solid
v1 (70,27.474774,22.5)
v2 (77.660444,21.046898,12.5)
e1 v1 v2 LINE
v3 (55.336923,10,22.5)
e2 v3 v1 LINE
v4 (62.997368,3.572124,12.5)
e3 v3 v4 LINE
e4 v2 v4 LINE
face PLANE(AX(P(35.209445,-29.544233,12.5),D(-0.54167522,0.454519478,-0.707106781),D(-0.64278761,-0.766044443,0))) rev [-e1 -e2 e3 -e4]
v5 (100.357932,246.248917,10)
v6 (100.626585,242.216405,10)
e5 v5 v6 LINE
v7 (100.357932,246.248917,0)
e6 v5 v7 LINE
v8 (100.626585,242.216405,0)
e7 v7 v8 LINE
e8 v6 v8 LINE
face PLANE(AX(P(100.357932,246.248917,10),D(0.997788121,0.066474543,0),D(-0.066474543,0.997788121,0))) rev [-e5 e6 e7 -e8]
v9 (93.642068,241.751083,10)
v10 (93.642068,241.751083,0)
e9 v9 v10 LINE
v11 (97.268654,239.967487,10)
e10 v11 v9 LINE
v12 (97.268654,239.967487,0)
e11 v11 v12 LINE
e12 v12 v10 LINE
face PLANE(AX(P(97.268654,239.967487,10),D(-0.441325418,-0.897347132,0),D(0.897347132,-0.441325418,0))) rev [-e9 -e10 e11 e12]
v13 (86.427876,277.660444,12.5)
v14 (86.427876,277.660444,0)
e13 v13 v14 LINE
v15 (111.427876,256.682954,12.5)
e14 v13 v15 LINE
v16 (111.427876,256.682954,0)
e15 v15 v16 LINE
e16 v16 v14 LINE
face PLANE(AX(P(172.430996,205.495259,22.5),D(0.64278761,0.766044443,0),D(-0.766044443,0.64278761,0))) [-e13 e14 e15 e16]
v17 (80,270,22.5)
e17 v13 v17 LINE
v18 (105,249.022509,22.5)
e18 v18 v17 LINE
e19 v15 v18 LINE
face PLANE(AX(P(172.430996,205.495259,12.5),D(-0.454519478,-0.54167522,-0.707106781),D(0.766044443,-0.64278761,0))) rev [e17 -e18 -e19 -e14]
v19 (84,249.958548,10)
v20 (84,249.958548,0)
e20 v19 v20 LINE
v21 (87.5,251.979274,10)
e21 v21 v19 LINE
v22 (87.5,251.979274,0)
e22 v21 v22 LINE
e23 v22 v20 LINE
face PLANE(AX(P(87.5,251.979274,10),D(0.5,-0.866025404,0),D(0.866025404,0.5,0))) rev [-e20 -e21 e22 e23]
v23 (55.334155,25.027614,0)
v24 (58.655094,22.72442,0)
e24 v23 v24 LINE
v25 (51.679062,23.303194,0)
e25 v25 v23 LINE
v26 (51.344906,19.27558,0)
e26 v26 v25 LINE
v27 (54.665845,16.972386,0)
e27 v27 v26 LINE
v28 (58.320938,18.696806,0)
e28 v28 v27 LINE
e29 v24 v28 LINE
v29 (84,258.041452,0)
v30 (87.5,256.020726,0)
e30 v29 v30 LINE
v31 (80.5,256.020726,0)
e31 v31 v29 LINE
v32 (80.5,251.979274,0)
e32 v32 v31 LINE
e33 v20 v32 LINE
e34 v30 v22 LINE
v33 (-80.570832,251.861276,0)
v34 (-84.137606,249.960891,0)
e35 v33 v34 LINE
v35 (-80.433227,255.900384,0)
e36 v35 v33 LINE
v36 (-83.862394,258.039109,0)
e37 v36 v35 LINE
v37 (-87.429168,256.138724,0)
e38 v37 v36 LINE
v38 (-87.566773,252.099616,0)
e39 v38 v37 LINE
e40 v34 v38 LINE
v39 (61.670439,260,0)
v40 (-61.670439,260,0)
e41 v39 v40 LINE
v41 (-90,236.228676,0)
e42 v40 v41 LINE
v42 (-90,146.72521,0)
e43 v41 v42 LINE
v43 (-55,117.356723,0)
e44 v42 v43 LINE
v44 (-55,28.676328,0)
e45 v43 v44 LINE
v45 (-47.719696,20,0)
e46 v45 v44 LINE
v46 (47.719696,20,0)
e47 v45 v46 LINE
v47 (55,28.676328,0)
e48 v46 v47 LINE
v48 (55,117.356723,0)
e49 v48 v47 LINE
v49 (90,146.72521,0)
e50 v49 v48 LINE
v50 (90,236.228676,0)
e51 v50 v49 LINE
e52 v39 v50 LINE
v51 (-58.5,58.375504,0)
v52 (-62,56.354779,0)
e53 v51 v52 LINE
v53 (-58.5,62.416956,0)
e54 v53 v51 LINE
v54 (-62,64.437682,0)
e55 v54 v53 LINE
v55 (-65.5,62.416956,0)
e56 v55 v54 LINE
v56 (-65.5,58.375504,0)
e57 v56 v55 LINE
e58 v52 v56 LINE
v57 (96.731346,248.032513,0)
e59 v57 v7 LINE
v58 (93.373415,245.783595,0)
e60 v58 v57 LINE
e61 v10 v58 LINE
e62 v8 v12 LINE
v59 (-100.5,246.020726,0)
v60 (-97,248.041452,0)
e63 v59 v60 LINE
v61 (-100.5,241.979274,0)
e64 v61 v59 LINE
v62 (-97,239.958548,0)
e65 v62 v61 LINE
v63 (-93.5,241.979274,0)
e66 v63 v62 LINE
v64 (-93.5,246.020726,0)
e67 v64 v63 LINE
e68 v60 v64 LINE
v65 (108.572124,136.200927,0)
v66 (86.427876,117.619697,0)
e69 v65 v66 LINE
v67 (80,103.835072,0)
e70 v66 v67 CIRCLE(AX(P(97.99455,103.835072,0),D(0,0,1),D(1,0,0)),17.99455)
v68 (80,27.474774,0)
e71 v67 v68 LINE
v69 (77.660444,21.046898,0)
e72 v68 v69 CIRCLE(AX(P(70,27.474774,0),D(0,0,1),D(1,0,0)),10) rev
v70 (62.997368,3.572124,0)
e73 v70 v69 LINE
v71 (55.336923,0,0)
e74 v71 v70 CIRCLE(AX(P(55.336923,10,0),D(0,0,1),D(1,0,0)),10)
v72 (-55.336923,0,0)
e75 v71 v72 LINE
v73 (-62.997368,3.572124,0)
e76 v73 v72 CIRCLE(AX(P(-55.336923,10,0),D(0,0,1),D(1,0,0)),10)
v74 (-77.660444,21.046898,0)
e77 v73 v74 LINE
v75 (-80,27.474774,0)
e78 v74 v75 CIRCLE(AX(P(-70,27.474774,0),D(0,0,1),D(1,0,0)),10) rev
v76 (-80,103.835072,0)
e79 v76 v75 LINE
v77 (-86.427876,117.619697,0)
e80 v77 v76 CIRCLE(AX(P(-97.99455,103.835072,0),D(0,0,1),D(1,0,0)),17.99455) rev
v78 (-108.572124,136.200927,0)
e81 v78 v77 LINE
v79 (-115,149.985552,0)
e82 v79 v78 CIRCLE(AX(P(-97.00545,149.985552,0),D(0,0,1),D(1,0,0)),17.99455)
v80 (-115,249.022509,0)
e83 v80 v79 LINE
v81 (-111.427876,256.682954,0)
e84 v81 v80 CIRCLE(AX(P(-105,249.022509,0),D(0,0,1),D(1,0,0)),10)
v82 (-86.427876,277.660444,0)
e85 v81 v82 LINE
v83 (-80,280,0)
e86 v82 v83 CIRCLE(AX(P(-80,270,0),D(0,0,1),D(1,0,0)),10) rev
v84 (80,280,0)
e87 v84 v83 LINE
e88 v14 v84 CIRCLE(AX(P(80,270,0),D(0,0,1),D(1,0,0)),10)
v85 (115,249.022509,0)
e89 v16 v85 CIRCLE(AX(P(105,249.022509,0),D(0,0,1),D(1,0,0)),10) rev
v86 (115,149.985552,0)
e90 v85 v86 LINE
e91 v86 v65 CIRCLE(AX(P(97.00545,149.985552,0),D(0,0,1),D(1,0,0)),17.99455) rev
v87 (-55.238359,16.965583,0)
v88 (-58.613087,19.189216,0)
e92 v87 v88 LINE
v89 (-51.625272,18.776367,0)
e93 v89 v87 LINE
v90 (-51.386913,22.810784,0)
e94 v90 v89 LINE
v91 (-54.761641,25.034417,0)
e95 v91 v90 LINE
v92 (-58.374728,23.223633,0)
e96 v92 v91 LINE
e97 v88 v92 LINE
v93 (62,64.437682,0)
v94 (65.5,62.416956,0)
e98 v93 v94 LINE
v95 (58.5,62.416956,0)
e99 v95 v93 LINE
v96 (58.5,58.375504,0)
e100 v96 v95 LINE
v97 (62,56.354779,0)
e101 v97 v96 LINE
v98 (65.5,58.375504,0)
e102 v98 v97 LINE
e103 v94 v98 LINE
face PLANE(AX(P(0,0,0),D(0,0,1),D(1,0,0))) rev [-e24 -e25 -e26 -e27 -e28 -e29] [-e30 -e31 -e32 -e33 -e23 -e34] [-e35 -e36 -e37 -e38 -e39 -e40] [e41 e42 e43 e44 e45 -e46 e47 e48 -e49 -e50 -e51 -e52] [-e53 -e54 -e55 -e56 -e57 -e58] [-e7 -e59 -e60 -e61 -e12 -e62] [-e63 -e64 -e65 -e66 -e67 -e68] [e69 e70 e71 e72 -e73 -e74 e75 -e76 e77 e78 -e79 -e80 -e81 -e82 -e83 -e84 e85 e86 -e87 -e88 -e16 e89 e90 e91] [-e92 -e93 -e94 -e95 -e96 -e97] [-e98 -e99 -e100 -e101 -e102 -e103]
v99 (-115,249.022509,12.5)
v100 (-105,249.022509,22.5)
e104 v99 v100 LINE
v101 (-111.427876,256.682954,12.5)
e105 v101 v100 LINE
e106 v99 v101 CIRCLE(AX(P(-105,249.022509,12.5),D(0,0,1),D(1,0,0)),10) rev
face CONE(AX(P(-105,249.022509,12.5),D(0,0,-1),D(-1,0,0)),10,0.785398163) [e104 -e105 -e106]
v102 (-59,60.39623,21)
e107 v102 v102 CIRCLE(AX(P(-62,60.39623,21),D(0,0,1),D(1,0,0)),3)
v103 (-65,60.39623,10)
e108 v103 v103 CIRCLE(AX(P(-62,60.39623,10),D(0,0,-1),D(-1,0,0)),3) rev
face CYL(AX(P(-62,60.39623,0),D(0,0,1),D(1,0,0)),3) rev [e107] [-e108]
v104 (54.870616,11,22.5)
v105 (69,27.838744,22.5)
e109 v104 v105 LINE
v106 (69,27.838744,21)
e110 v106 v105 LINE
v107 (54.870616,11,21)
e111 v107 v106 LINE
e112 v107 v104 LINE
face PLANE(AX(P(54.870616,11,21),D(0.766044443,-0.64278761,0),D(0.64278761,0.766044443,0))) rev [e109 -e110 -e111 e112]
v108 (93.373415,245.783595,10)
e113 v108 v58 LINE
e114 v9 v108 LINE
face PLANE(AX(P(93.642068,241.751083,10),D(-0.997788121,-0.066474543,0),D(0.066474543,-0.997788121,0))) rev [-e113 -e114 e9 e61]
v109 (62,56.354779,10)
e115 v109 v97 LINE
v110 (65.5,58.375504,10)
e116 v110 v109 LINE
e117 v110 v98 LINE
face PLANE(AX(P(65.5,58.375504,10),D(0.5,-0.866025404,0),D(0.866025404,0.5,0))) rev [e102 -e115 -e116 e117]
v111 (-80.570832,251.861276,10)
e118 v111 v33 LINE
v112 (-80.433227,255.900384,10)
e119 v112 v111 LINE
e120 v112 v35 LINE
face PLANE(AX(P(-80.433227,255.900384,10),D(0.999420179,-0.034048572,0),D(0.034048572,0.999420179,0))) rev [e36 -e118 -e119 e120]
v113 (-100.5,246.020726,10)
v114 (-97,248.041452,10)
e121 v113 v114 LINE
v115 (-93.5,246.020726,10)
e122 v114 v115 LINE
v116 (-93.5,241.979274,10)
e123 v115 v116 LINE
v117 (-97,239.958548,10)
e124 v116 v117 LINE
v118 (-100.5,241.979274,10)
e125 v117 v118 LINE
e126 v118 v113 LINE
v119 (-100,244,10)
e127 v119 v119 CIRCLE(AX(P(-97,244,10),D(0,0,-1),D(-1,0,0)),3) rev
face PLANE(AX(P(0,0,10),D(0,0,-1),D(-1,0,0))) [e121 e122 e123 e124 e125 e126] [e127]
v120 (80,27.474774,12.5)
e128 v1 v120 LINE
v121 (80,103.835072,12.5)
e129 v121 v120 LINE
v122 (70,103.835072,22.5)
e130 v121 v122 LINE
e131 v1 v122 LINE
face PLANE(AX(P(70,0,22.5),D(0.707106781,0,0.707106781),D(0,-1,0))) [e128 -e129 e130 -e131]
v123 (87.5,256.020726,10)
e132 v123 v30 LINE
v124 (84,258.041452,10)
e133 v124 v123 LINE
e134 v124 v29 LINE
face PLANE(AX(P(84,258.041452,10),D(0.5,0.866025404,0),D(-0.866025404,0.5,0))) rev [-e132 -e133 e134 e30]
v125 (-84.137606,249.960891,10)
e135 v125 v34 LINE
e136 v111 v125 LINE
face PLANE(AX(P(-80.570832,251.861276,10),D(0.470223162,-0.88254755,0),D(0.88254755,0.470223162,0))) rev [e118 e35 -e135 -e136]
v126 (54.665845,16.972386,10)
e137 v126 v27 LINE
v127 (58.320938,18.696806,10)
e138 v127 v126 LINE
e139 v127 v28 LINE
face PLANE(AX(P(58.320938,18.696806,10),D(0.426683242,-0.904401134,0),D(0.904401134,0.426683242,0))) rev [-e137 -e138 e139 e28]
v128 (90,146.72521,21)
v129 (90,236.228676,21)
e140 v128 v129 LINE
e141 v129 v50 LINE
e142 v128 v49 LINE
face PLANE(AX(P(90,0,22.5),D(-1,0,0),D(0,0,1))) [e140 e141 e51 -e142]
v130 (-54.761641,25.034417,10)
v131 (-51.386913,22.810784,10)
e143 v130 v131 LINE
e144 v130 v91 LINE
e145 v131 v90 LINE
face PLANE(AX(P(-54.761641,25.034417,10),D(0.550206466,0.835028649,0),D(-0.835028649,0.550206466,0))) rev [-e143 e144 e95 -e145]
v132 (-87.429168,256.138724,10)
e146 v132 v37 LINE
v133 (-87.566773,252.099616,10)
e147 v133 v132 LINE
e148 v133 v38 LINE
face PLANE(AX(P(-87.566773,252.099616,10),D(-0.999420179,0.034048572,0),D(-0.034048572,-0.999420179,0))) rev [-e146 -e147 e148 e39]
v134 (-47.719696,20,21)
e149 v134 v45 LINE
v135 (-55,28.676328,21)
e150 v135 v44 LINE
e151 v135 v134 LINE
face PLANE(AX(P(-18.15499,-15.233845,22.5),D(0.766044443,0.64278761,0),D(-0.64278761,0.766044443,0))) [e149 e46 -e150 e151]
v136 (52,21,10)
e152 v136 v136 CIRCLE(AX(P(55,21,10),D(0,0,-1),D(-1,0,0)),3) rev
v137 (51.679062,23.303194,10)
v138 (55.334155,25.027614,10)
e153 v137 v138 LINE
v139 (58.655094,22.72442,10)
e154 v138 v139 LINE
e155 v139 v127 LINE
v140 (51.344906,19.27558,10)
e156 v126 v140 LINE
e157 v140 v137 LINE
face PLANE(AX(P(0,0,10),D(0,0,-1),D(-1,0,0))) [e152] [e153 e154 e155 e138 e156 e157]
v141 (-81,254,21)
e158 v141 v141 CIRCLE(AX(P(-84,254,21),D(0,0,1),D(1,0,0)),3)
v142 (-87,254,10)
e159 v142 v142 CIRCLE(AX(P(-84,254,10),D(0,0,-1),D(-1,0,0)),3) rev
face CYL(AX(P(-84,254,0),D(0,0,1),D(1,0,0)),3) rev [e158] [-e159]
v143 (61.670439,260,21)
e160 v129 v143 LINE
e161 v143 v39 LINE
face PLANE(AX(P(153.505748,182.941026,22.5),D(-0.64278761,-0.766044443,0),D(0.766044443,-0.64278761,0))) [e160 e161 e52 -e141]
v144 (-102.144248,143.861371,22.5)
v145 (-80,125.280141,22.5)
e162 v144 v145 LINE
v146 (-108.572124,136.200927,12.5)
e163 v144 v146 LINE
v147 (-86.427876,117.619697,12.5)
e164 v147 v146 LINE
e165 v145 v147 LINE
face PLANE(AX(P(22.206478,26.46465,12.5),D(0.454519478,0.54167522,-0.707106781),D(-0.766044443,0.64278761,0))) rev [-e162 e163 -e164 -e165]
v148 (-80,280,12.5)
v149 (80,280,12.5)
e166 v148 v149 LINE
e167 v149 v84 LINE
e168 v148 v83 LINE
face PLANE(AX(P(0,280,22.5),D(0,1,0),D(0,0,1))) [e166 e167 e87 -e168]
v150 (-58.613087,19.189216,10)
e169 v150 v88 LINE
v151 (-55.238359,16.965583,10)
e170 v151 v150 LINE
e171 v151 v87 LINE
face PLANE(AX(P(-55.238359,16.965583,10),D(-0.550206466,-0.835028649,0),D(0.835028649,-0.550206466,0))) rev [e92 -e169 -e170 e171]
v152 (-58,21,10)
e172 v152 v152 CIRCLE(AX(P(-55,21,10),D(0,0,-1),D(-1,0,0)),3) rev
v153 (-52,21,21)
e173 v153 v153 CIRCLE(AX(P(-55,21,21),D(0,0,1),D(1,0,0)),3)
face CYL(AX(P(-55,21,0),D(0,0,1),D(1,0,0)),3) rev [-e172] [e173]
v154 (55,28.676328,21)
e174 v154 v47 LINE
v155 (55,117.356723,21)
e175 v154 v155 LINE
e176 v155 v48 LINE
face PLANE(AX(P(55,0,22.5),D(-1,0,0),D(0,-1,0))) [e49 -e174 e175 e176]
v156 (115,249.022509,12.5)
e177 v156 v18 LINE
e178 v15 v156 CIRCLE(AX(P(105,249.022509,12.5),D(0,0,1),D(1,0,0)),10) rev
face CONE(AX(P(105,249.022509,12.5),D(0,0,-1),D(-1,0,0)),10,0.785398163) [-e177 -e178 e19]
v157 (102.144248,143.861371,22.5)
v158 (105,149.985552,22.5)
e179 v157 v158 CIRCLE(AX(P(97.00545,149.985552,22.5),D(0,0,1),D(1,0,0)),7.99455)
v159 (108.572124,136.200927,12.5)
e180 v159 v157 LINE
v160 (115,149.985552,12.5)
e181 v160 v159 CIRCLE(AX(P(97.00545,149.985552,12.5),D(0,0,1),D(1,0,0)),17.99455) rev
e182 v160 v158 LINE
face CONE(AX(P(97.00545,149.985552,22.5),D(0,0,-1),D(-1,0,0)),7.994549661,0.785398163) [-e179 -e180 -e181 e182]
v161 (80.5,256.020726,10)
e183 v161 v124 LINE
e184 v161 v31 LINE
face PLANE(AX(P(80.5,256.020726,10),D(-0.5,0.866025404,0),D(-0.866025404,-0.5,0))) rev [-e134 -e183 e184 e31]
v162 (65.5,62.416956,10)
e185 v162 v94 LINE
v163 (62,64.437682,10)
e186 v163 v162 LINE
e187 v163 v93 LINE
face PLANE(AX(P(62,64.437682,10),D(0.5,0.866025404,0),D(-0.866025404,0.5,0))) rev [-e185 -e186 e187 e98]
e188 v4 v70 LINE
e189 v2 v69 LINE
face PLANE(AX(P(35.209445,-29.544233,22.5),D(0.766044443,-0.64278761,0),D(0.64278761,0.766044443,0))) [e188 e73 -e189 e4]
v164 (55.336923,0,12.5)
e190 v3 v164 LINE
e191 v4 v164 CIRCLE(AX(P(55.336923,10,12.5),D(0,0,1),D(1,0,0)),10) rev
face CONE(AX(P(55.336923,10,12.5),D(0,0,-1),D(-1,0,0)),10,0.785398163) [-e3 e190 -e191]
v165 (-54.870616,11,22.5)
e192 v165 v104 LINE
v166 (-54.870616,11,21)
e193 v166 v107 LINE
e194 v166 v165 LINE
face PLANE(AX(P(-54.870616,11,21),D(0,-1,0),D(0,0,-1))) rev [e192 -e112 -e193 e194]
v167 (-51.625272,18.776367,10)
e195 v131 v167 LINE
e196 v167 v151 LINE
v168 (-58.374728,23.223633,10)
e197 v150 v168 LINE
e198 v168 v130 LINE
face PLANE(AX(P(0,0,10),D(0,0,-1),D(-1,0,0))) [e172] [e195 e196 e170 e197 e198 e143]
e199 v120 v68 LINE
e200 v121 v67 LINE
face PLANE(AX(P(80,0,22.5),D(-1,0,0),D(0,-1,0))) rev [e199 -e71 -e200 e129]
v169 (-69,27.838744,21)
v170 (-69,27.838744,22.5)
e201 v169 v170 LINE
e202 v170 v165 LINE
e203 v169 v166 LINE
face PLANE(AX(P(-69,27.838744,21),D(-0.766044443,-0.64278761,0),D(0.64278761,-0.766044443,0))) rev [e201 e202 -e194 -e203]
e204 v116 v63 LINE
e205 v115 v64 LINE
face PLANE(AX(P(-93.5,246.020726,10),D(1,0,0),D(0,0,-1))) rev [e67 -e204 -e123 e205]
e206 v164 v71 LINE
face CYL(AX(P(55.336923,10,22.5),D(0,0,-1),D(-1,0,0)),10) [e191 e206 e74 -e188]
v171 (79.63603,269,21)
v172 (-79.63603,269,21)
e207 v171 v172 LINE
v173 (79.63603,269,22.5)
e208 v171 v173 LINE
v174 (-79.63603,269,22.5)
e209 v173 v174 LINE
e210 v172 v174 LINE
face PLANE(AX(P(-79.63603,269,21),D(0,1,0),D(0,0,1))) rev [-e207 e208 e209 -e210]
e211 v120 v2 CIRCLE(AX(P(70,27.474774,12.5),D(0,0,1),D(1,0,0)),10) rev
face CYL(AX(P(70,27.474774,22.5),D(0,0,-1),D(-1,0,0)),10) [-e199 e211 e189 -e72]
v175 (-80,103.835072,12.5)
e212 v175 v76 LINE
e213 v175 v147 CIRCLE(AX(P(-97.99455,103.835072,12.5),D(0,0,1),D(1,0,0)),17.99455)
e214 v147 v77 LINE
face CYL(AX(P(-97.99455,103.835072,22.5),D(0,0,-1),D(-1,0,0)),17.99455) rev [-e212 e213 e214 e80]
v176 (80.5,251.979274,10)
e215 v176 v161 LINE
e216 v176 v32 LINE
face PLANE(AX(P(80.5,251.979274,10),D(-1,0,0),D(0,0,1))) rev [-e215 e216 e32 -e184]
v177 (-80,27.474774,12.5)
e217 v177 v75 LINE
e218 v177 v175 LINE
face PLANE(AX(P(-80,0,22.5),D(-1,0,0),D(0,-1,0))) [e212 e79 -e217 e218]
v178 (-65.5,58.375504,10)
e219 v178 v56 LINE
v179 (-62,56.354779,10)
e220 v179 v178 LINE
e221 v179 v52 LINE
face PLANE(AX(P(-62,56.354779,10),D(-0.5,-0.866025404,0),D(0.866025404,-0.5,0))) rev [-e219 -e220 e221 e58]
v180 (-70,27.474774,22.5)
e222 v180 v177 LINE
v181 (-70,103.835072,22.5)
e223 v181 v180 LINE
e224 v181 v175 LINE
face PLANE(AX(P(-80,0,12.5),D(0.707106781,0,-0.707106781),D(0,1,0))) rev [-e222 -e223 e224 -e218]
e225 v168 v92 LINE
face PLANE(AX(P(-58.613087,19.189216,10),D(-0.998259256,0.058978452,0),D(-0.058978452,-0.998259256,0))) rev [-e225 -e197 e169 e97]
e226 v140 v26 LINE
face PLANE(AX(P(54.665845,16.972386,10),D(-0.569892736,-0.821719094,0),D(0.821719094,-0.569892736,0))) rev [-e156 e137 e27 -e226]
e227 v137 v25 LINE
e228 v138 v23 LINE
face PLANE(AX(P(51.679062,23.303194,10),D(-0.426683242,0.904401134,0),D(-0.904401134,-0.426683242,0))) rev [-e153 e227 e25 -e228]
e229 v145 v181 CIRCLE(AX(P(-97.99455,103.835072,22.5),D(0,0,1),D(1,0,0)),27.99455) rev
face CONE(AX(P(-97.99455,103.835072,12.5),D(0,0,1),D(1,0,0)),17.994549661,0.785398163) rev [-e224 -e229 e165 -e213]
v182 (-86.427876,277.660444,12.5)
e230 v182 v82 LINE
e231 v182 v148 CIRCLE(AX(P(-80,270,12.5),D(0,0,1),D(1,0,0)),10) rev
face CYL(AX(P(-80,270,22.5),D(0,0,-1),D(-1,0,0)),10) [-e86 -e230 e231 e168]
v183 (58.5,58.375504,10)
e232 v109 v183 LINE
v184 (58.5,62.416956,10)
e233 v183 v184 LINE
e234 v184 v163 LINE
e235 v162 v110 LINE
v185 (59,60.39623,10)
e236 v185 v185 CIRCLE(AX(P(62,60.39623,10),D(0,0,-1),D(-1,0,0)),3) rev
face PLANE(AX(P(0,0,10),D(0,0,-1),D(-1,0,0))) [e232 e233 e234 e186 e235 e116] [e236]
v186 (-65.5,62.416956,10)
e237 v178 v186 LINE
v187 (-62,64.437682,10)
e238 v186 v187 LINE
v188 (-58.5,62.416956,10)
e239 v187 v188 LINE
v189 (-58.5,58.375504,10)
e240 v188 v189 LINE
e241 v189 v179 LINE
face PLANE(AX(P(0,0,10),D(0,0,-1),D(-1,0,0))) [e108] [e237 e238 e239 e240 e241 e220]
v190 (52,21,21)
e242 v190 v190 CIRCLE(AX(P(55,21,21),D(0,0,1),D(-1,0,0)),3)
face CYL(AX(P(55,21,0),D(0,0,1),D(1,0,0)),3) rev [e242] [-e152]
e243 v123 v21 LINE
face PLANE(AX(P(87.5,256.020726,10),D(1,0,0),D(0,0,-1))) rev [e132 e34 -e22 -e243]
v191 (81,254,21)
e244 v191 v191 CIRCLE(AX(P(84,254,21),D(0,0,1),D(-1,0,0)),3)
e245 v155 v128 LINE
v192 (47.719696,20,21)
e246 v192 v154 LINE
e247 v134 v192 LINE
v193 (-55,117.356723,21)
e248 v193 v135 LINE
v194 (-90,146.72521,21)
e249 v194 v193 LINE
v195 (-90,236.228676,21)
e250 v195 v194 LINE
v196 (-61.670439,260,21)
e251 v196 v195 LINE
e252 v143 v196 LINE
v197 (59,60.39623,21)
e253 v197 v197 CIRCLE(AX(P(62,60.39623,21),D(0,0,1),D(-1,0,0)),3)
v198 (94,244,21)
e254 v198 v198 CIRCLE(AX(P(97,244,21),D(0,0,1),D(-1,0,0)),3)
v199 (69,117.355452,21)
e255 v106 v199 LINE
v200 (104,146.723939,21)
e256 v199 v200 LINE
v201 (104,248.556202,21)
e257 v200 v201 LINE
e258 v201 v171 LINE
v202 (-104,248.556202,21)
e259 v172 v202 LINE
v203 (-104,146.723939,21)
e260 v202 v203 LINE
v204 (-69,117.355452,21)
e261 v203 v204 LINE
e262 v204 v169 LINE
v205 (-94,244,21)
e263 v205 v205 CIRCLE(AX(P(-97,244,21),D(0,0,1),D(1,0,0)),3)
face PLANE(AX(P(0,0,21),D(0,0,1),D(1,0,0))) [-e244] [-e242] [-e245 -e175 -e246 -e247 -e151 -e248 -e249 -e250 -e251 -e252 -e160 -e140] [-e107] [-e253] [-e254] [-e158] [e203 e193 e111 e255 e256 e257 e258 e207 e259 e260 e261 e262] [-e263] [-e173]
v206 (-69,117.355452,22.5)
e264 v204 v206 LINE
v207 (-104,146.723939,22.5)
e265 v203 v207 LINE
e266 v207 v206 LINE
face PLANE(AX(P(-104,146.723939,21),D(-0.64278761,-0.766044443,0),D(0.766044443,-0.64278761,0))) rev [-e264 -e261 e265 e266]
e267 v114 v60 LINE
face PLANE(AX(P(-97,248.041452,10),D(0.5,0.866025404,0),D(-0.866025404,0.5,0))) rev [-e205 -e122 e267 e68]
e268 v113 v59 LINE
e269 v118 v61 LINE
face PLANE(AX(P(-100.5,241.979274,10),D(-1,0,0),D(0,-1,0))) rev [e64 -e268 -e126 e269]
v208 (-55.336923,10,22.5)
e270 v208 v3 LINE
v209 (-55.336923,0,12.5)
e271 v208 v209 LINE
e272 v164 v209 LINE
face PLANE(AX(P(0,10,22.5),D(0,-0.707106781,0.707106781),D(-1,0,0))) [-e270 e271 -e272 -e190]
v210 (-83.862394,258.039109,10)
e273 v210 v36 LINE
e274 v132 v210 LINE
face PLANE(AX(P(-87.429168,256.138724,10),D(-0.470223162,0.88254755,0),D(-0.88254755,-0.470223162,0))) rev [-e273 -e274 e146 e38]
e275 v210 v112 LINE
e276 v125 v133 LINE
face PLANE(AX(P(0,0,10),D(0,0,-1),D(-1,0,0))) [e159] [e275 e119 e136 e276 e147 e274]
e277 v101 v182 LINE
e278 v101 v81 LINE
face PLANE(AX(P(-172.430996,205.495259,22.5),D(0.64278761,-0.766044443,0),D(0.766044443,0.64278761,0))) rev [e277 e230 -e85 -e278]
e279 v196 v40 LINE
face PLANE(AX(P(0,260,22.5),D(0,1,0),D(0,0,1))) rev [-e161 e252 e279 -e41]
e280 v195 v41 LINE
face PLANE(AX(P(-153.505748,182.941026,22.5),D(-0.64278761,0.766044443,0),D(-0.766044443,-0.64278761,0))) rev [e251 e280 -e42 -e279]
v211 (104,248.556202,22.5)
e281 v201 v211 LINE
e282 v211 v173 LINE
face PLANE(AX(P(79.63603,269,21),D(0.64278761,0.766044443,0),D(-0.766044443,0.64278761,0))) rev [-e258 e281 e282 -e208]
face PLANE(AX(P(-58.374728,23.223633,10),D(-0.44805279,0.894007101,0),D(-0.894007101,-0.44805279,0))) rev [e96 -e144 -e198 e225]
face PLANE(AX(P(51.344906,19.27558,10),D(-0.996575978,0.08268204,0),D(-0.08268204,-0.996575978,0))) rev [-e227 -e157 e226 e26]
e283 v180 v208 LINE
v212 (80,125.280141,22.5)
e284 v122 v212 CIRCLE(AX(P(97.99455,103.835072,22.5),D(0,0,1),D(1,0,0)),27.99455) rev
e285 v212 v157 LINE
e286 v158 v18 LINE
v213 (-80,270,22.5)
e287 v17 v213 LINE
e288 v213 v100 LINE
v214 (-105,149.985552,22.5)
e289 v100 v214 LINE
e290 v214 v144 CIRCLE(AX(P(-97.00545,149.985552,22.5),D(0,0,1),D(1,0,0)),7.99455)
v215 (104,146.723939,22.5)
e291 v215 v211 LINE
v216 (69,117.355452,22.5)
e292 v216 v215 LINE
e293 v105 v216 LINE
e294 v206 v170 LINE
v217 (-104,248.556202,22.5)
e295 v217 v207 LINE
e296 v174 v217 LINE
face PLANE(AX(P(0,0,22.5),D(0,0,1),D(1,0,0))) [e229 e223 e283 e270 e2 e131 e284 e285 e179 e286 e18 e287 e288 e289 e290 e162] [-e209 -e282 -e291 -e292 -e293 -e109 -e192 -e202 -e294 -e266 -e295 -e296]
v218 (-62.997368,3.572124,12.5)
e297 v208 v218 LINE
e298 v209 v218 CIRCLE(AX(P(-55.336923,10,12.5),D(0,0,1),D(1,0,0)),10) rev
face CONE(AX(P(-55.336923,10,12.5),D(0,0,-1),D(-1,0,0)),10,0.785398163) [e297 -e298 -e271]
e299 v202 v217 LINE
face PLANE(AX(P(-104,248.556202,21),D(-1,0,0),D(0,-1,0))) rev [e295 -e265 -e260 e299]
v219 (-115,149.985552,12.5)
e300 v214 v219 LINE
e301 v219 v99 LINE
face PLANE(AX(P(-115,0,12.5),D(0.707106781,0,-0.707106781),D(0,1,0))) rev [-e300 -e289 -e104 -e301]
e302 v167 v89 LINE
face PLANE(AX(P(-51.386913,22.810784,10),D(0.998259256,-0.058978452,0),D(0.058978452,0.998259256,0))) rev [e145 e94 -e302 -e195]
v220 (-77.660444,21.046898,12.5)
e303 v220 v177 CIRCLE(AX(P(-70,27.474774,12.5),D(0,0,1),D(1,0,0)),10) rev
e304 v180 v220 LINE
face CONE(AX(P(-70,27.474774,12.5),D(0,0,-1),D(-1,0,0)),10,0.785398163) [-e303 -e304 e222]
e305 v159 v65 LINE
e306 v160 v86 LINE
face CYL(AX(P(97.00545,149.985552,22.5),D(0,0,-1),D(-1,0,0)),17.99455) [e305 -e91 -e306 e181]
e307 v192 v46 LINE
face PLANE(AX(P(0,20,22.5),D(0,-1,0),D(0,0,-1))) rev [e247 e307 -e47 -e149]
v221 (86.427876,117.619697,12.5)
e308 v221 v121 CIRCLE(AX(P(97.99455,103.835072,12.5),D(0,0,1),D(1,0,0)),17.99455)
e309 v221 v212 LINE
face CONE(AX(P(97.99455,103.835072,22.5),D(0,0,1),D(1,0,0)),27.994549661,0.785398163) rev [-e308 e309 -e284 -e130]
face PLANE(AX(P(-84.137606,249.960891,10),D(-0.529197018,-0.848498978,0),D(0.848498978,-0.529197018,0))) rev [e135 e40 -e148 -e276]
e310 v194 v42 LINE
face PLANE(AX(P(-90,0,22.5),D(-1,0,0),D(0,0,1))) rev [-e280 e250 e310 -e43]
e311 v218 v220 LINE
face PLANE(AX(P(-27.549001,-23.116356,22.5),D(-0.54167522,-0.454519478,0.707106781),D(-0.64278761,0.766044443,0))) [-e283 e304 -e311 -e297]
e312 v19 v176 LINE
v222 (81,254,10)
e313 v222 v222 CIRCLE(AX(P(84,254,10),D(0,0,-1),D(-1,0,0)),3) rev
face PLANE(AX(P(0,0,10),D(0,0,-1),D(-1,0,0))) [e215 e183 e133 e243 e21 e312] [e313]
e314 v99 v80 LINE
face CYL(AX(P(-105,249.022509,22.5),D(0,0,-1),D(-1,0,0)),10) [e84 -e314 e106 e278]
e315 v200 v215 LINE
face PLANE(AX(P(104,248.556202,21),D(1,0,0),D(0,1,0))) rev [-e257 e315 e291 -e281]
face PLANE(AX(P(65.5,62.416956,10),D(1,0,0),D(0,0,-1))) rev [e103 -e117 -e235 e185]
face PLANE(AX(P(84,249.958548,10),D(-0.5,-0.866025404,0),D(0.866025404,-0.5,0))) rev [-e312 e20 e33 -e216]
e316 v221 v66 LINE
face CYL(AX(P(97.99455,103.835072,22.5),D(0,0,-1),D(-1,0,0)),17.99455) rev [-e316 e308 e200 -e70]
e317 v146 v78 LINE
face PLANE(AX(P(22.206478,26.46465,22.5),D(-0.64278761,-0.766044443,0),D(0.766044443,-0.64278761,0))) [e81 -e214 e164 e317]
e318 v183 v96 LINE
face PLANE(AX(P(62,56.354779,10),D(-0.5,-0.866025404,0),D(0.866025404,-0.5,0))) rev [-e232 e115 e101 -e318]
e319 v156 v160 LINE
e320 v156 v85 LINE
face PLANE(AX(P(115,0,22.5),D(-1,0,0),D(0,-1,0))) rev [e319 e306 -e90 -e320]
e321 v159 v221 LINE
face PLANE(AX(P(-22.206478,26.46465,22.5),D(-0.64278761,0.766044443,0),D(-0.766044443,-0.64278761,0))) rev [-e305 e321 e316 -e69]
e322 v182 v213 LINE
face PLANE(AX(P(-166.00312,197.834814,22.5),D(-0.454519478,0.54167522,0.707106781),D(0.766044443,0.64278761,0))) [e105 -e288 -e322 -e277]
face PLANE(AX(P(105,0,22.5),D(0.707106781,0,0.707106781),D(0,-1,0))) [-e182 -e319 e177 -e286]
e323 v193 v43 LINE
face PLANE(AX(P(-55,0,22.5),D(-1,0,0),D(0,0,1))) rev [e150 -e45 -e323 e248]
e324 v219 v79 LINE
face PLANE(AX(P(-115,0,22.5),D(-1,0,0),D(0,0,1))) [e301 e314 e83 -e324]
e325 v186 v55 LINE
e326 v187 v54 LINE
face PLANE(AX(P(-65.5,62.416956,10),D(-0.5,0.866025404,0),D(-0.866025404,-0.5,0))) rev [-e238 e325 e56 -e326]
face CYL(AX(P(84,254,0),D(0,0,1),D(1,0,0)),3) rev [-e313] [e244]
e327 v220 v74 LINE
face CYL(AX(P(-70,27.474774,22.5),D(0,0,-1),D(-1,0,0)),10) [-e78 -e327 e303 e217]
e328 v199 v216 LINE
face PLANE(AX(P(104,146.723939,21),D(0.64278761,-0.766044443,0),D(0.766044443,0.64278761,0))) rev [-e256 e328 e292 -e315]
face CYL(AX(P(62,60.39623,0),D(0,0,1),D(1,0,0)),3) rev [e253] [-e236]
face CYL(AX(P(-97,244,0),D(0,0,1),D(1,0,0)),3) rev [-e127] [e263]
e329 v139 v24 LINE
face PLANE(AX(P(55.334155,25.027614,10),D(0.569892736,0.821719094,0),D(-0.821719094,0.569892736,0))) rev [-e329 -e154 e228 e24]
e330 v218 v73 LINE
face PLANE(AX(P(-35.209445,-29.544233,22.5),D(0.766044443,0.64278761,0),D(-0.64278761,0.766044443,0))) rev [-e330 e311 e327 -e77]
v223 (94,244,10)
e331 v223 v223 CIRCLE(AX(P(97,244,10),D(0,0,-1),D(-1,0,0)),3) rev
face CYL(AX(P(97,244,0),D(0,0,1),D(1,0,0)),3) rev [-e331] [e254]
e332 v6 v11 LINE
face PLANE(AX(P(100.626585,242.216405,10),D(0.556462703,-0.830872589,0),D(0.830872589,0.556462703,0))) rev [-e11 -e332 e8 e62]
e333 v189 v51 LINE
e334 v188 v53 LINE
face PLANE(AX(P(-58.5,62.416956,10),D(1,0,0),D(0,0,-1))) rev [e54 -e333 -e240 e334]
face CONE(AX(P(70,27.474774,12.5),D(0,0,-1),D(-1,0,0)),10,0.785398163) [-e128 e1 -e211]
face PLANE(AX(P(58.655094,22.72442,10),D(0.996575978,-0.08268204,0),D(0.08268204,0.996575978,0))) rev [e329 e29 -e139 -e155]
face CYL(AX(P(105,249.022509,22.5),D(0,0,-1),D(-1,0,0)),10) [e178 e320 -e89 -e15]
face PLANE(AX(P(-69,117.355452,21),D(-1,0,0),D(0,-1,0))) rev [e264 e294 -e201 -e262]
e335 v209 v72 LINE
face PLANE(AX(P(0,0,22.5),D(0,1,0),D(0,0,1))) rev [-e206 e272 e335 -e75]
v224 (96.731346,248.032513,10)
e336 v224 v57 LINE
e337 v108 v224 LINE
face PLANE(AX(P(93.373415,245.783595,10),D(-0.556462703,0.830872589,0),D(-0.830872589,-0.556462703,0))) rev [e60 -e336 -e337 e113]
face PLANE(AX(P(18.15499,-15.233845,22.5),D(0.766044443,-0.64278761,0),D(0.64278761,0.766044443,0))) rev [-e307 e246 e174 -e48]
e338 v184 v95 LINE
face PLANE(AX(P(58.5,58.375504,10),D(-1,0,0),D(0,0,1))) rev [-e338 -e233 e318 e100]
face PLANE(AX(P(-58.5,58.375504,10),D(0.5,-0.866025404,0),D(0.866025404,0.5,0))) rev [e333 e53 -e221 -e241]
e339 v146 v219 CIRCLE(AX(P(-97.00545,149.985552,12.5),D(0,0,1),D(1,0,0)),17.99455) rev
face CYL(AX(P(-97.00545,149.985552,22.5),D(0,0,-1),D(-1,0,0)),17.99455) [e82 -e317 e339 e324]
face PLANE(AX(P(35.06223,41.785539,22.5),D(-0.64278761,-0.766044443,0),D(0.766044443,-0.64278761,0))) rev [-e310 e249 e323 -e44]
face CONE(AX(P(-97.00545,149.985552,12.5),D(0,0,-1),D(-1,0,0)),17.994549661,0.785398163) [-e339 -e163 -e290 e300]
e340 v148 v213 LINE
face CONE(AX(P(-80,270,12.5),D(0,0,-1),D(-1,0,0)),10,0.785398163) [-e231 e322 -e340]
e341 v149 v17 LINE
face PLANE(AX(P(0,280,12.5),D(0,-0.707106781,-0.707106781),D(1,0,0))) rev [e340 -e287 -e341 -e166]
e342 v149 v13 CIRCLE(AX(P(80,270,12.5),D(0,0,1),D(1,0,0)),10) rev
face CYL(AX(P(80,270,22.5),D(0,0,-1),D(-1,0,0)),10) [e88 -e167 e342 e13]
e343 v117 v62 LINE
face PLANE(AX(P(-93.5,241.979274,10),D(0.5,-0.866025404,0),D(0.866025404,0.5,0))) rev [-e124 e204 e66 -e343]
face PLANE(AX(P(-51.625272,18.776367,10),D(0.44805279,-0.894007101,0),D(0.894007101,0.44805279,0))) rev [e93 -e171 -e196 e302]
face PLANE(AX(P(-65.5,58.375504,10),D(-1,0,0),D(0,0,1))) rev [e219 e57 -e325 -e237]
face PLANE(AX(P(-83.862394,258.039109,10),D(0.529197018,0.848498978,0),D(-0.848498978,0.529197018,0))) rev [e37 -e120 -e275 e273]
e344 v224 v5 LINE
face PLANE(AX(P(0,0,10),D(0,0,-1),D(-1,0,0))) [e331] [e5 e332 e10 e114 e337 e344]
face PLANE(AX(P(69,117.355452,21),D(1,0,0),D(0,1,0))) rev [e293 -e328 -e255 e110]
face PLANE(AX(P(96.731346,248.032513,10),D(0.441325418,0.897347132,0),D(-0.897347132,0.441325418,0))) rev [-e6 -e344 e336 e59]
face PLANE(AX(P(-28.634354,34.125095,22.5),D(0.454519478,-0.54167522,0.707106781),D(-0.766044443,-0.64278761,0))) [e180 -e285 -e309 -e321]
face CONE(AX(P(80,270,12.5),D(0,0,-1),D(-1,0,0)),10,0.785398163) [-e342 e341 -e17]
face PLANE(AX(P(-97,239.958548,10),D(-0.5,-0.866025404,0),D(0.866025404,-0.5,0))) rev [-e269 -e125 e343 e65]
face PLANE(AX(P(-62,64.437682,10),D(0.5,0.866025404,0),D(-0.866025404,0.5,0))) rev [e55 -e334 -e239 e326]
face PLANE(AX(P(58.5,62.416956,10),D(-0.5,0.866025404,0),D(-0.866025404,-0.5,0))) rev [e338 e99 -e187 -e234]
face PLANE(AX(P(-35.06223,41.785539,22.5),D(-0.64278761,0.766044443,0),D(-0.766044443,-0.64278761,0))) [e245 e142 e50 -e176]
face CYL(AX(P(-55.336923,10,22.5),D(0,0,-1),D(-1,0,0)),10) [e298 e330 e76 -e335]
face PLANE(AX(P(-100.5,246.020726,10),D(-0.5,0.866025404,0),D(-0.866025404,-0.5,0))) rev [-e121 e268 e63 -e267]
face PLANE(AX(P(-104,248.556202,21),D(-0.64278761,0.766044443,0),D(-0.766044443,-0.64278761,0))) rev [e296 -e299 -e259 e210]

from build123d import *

# Parameters (mm, degrees)
RESSALTO_EXTRUS_O1_DEPTH = 22.5
CHANFRO1_SIZE            = 10
CORTE_EXTRUS_O1_REACH    = 305.531
ESBO_O3_W                = 1139.230904301
ESBO_O3_H                = 709.798033895
CORTE_EXTRUS_O5_DEPTH    = 1.5
ESBO_O5_R                = 3
CORTE_EXTRUS_O6_DEPTH    = 304.423796035
CORTE_EXTRUS_O8_DEPTH    = 10


with BuildPart() as part:
    # Esboço1 → Ressalto-extrusão1 (new, symmetric)
    with BuildSketch(Plane.XY):
        with BuildLine():
            Line((-55.336923418, 0), (55.336923418, 0))
            ThreePointArc((55.336923418, 0), (59.563106036, 0.93692213), (62.99736785, 3.572123903))
            Line((62.99736785, 3.572123903), (77.660444431, 21.046898098))
            ThreePointArc((77.660444431, 21.046898098), (79.396926208, 24.054572761), (80, 27.474774195))
            Line((80, 27.474774195), (80, 103.835071852))
            ThreePointArc((80, 103.835071852), (81.685949179, 111.43989715), (86.427876097, 117.619696626))
            Line((86.427876097, 117.619696626), (108.572123903, 136.200926793))
            ThreePointArc((108.572123903, 136.200926793), (113.314050821, 142.380726268), (115, 149.985551567))
            Line((115, 149.985551567), (115, 249.022509221))
            ThreePointArc((115, 249.022509221), (114.06307787, 253.248691838), (111.427876097, 256.682953652))
            Line((111.427876097, 256.682953652), (86.427876097, 277.660444431))
            ThreePointArc((86.427876097, 277.660444431), (83.420201433, 279.396926208), (80, 280))
            Line((80, 280), (-80, 280))
            ThreePointArc((-80, 280), (-83.420201433, 279.396926208), (-86.427876097, 277.660444431))
            Line((-86.427876097, 277.660444431), (-111.427876097, 256.682953652))
            ThreePointArc((-111.427876097, 256.682953652), (-114.06307787, 253.248691838), (-115, 249.022509221))
            Line((-115, 249.022509221), (-115, 149.985551567))
            ThreePointArc((-115, 149.985551567), (-113.314050821, 142.380726268), (-108.572123903, 136.200926793))
            Line((-108.572123903, 136.200926793), (-86.427876097, 117.619696626))
            ThreePointArc((-86.427876097, 117.619696626), (-81.685949179, 111.43989715), (-80, 103.835071852))
            Line((-80, 103.835071852), (-80, 27.474774195))
            ThreePointArc((-80, 27.474774195), (-79.396926208, 24.054572761), (-77.660444431, 21.046898098))
            Line((-77.660444431, 21.046898098), (-62.99736785, 3.572123903))
            ThreePointArc((-62.99736785, 3.572123903), (-59.563106036, 0.93692213), (-55.336923418, 0))
        make_face()
        Polygon((-90, 146.725210262), (-90, 236.228675506), (-61.670438633, 260), (61.670438633, 260), (90, 236.228675506), (90, 146.725210262), (55, 117.356723171), (55, 28.676328085), (47.719696304, 20), (-47.719696304, 20), (-55, 28.676328085), (-55, 117.356723171), align=None, mode=Mode.SUBTRACT)
    extrude(amount=RESSALTO_EXTRUS_O1_DEPTH, both=True)

    # Chanfro1
    chanfro1_edges = [part.edges().sort_by_distance(p)[0] for p in [
        (-70.32890614, 12.309511, 22.5),
        (-59.563106036, 0.93692213, 22.5),
        (0, 0, 22.5),
        (59.563106036, 0.93692213, 22.5),
        (70.32890614, 12.309511, 22.5),
        (79.396926208, 24.054572761, 22.5),
        (80, 65.654923023, 22.5),
        (81.685949179, 111.43989715, 22.5),
        (97.5, 126.910311709, 22.5),
        (113.314050821, 142.380726268, 22.5),
        (115, 199.504030394, 22.5),
        (114.06307787, 253.248691838, 22.5),
        (98.927876097, 267.171699041, 22.5),
        (98.927876097, 267.171699041, -22.5),
        (114.06307787, 253.248691838, -22.5),
        (115, 199.504030394, -22.5),
        (113.314050821, 142.380726268, -22.5),
        (97.5, 126.910311709, -22.5),
        (81.685949179, 111.43989715, -22.5),
        (80, 65.654923023, -22.5),
        (79.396926208, 24.054572761, -22.5),
        (70.32890614, 12.309511, -22.5),
        (59.563106036, 0.93692213, -22.5),
        (0, 0, -22.5),
        (-59.563106036, 0.93692213, -22.5),
        (-70.32890614, 12.309511, -22.5),
        (-79.396926208, 24.054572761, -22.5),
        (-80, 65.654923023, -22.5),
        (-81.685949179, 111.43989715, -22.5),
        (-97.5, 126.910311709, -22.5),
        (-113.314050821, 142.380726268, -22.5),
        (-115, 199.504030394, -22.5),
        (-114.06307787, 253.248691838, -22.5),
        (-98.927876097, 267.171699041, -22.5),
        (-83.420201433, 279.396926208, -22.5),
        (0, 280, -22.5),
        (83.420201433, 279.396926208, -22.5),
        (83.420201433, 279.396926208, 22.5),
        (0, 280, 22.5),
        (-83.420201433, 279.396926208, 22.5),
        (-98.927876097, 267.171699041, 22.5),
        (-114.06307787, 253.248691838, 22.5),
        (-115, 199.504030394, 22.5),
        (-113.314050821, 142.380726268, 22.5),
        (-97.5, 126.910311709, 22.5),
        (-81.685949179, 111.43989715, 22.5),
        (-80, 65.654923023, 22.5),
        (-79.396926208, 24.054572761, 22.5),
    ]]
    chamfer(chanfro1_edges, length=CHANFRO1_SIZE - 0.0001)  # a hair under: the kernel refuses the full size

    # Esboço3 → Corte-extrusão1 (cut, up to next)
    with BuildSketch(Plane.XY, mode=Mode.PRIVATE) as corte_extrus_o1_sk1:
        with Locations((-153.157436203, 152.53565808)):
            Rectangle(ESBO_O3_W, ESBO_O3_H)
    corte_extrus_o1_tool1 = extrude(corte_extrus_o1_sk1.sketch, amount=-CORTE_EXTRUS_O1_REACH, mode=Mode.PRIVATE) & part.part
    add(corte_extrus_o1_tool1.solids().sort_by_distance((-153.157436, 152.535658, 0))[0], mode=Mode.SUBTRACT)

    # Esboço4 → Corte-extrusão5 (cut)
    with BuildSketch(Plane.XY.offset(22.5)):
        Polygon((-69, 27.838744429), (-54.87061576, 11), (54.87061576, 11), (69, 27.838744429), (69, 117.355452403), (104, 146.723939495), (104, 248.556201562), (79.636029766, 269), (-79.636029766, 269), (-104, 248.556201562), (-104, 146.723939495), (-69, 117.355452403), align=None)
        Polygon((-90, 146.725210262), (-90, 236.228675506), (-61.670438633, 260), (61.670438633, 260), (90, 236.228675506), (90, 146.725210262), (55, 117.356723171), (55, 28.676328085), (47.719696304, 20), (-47.719696304, 20), (-55, 28.676328085), (-55, 117.356723171), align=None, mode=Mode.SUBTRACT)
    extrude(amount=-CORTE_EXTRUS_O5_DEPTH, mode=Mode.SUBTRACT)

    # Esboço5 → Corte-extrusão6 (cut, through all)
    with BuildSketch(Plane.XY.offset(21)):
        with Locations((-97, 244)):
            Circle(ESBO_O5_R)
        with Locations((-62, 60.396230411)):
            Circle(ESBO_O5_R)
        with Locations((-84, 254)):
            Circle(ESBO_O5_R)
        with Locations((-55, 21)):
            Circle(ESBO_O5_R)
        with Locations(Location((55, 21, 0), (0, 0, 180))):
            Circle(ESBO_O5_R)
        with Locations(Location((84, 254, 0), (0, 0, 180))):
            Circle(ESBO_O5_R)
        with Locations(Location((62, 60.396230411, 0), (0, 0, 180))):
            Circle(ESBO_O5_R)
        with Locations(Location((97, 244, 0), (0, 0, 180))):
            Circle(ESBO_O5_R)
    extrude(amount=-CORTE_EXTRUS_O6_DEPTH, mode=Mode.SUBTRACT)

    # Esboço7 → Corte-extrusão8 (cut)
    with BuildSketch(Plane(origin=(0, 0, 0), x_dir=(-1, 0, 0), z_dir=(0, 0, -1))):
        Polygon((83.862394336, 258.039108567), (80.43322654, 255.900384282), (80.570832205, 251.861275715), (84.137605664, 249.960891433), (87.56677346, 252.099615718), (87.429167795, 256.138724285), align=None)
        Polygon((-96.731346334, 248.032512683), (-100.357931592, 246.248917241), (-100.626585258, 242.216404558), (-97.268653666, 239.967487317), (-93.642068408, 241.751082759), (-93.373414742, 245.783595442), align=None)
        Polygon((-62, 64.437682295), (-65.5, 62.416956353), (-65.5, 58.375504468), (-62, 56.354778526), (-58.5, 58.375504468), (-58.5, 62.416956353), align=None)
        Polygon((-84, 258.041451884), (-87.5, 256.020725942), (-87.5, 251.979274058), (-84, 249.958548116), (-80.5, 251.979274058), (-80.5, 256.020725942), align=None)
        Polygon((54.761641425, 25.034416751), (51.386913316, 22.810783794), (51.625271892, 18.776367043), (55.238358575, 16.965583249), (58.613086684, 19.189216206), (58.374728108, 23.223632957), align=None)
        Polygon((62, 64.437682295), (58.5, 62.416956353), (58.5, 58.375504468), (62, 56.354778526), (65.5, 58.375504468), (65.5, 62.416956353), align=None)
        Polygon((97, 248.041451884), (93.5, 246.020725942), (93.5, 241.979274058), (97, 239.958548116), (100.5, 241.979274058), (100.5, 246.020725942), align=None)
        Polygon((-55.334155485, 25.027613865), (-58.655093666, 22.724419793), (-58.320938181, 18.696805928), (-54.665844515, 16.972386135), (-51.344906334, 19.275580207), (-51.679061819, 23.303194072), align=None)
    extrude(amount=-CORTE_EXTRUS_O8_DEPTH, mode=Mode.SUBTRACT)


solid = part.part
